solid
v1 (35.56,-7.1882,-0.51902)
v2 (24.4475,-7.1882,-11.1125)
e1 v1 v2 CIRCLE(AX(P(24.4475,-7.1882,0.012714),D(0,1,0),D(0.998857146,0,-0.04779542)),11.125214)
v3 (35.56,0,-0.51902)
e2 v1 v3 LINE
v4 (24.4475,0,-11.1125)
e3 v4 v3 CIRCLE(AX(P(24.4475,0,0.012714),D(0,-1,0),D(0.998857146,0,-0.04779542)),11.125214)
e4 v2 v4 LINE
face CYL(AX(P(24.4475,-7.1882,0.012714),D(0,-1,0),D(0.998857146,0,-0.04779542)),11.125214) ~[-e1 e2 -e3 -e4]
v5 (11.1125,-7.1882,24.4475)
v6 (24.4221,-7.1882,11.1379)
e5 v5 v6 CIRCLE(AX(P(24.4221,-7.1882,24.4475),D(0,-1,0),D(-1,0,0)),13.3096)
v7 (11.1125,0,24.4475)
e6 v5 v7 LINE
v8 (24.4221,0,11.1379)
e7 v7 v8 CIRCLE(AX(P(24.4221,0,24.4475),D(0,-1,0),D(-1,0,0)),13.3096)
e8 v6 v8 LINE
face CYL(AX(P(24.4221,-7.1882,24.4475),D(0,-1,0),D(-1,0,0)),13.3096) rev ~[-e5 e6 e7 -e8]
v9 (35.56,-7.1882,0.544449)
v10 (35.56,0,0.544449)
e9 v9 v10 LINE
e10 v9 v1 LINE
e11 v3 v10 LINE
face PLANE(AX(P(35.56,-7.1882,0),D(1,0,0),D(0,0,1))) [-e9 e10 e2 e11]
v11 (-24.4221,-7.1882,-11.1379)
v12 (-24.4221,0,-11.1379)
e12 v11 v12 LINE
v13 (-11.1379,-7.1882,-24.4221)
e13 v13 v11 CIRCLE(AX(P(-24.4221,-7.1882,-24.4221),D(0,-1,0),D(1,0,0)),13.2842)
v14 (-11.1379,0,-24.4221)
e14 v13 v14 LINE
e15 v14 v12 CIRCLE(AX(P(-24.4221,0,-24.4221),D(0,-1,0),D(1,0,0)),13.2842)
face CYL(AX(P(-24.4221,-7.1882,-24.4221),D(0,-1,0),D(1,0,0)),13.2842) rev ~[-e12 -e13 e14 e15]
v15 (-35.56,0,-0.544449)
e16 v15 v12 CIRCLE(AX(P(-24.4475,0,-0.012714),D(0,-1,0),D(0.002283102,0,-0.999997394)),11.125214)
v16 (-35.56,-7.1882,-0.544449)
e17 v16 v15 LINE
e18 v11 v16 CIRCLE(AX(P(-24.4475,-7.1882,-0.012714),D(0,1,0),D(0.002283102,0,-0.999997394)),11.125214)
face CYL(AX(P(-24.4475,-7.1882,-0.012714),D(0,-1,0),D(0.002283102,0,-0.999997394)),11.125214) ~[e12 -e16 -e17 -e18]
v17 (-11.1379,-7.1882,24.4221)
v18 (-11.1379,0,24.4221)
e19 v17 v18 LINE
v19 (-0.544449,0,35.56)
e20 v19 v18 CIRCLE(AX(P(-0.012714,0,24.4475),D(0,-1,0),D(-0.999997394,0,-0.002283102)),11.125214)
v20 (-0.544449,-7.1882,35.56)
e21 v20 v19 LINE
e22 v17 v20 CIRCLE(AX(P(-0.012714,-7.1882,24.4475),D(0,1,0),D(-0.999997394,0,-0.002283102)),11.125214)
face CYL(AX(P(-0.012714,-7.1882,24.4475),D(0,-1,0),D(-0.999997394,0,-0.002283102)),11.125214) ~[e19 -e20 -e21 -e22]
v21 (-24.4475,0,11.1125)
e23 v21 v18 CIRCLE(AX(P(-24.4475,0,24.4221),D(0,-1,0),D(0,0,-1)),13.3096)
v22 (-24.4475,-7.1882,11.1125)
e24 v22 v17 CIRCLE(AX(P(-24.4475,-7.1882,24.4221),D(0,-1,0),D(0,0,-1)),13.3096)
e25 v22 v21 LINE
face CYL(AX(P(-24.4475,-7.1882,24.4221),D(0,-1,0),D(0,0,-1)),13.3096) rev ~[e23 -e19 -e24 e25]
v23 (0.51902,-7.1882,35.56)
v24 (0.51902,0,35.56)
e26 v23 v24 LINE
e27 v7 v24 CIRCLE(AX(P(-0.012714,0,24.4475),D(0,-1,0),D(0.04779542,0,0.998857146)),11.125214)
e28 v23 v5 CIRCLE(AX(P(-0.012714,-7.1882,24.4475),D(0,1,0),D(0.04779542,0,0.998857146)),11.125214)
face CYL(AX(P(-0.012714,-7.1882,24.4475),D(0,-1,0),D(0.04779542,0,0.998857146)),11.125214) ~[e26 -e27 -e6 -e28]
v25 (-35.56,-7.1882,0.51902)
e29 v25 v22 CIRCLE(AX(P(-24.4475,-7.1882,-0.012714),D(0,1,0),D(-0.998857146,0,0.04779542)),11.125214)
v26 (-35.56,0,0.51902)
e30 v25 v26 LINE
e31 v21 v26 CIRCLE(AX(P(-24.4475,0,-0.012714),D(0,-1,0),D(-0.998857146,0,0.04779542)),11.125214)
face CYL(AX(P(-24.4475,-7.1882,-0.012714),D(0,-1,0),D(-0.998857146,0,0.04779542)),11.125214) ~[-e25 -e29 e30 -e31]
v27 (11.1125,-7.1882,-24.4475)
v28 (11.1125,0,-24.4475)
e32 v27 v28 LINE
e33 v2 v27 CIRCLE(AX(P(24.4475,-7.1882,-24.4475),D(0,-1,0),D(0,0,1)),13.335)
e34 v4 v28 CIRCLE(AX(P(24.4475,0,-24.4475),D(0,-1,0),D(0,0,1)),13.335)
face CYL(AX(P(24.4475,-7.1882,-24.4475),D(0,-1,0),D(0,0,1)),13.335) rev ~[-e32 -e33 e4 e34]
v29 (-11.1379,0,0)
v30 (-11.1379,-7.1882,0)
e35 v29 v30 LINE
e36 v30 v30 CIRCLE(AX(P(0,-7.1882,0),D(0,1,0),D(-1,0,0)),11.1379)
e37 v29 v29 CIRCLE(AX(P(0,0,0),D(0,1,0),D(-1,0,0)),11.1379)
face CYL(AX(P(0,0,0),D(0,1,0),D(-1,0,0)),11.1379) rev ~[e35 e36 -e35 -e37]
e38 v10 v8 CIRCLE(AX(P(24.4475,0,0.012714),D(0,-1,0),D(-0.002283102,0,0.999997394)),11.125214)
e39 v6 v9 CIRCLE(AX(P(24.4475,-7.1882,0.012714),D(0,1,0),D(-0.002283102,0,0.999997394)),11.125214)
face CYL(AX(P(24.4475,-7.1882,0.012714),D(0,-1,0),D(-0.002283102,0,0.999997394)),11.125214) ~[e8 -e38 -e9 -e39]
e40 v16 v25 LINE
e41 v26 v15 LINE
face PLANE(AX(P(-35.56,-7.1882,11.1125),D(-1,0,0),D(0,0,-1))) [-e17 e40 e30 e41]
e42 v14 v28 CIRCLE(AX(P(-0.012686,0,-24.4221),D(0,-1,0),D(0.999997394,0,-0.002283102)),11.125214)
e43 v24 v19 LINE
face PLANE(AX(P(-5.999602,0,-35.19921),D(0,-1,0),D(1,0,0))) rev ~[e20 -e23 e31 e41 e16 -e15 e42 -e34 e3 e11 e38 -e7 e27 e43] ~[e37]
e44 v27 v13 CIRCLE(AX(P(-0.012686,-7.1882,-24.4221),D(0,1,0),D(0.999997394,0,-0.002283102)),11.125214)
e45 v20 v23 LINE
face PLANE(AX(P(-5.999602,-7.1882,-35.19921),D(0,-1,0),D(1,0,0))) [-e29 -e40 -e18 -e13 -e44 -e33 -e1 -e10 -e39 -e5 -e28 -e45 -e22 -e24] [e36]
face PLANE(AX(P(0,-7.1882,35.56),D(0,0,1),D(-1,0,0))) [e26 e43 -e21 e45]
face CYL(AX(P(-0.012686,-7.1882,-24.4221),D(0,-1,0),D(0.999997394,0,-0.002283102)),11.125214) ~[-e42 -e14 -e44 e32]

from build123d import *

# Parameters (mm, degrees)
F0_R      = 35.56
F1_DEPTH  = 7.1882
F2_R      = 11.1379
F3_DEPTH  = 7.62
F7_DEPTH  = 7.1882
F9_DEPTH  = 7.1882
F11_DEPTH = 7.1882
F13_DEPTH = 7.1882
F15_DEPTH = 25.4


# Not quite as in the source:
# - a feature of the source that left no trace in its solid (it failed there, or was rolled back) is left out


with BuildPart() as f1:
    # F0 (on Front) → F1 (new body)
    with BuildSketch(Plane.XZ):
        Circle(F0_R)
    extrude(amount=F1_DEPTH)

    # F2 (on face) → F3 (cut)
    with BuildSketch(Plane(origin=(0, 0, 0), x_dir=(-1, 0, 0), z_dir=(0, 1, 0))):
        Circle(F2_R)
    extrude(amount=-F3_DEPTH, mode=Mode.SUBTRACT)

    # F6 (on face) → F7 (join)
    with BuildSketch(Plane.XZ.offset(7.1882)):
        with BuildLine():
            Line((35.56, 11.1379), (33.7707089589, 11.1379))
            ThreePointArc((33.7707089589, 11.1379), (35.1098277593, 5.6403541298), (35.56, 0))
            Line((35.56, 0), (35.56, 11.1379))
        make_face()
        with BuildLine():
            Line((35.56, -11.1125), (35.56, 0))
            ThreePointArc((35.56, 0), (35.1119461572, -5.6271517709), (33.7790755313, -11.1125))
            Line((33.7790755313, -11.1125), (35.56, -11.1125))
        make_face()
    extrude(amount=-F7_DEPTH)

    # F8 (on face) → F9 (join)
    with BuildSketch(Plane.XZ.offset(7.1882)):
        with BuildLine():
            Line((-11.1379, 35.56), (-11.1379, 33.7707089589))
            ThreePointArc((-11.1379, 33.7707089589), (-5.6403540801, 35.1098277673), (1.006e-07, 35.56))
            Line((1.006e-07, 35.56), (-11.1379, 35.56))
        make_face()
        with BuildLine():
            Line((11.1125, 35.56), (1.006e-07, 35.56))
            ThreePointArc((1.006e-07, 35.56), (5.6271518206, 35.1119461492), (11.1125, 33.7790755313))
            Line((11.1125, 33.7790755313), (11.1125, 35.56))
        make_face()
    extrude(amount=-F9_DEPTH)

    # F10 (on face) → F11 (join)
    with BuildSketch(Plane.XZ.offset(7.1882)):
        with BuildLine():
            ThreePointArc((-35.56, 0), (-35.1119461572, 5.627151771), (-33.7790755313, 11.1125))
            Line((-33.7790755313, 11.1125), (-35.56, 11.1125))
            Line((-35.56, 11.1125), (-35.56, 0))
        make_face()
        with BuildLine():
            Line((-35.56, -11.1379), (-33.7707089589, -11.1379))
            ThreePointArc((-33.7707089589, -11.1379), (-35.1098277593, -5.6403541298), (-35.56, 0))
            Line((-35.56, 0), (-35.56, -11.1379))
        make_face()
    extrude(amount=-F11_DEPTH)

    # F12 (on face) → F13 (join)
    with BuildSketch(Plane.XZ.offset(7.1882)):
        with BuildLine():
            ThreePointArc((0, -35.56), (-5.6403541298, -35.1098277593), (-11.1379, -33.7707089589))
            Line((-11.1379, -33.7707089589), (-11.1379, -35.56))
            Line((-11.1379, -35.56), (0, -35.56))
        make_face()
        with BuildLine():
            Line((11.1125, -35.56), (11.1125, -33.7790755313))
            ThreePointArc((11.1125, -33.7790755313), (5.6271517709, -35.1119461572), (0, -35.56))
            Line((0, -35.56), (11.1125, -35.56))
        make_face()
    extrude(amount=-F13_DEPTH)

    # F14 (on face) → F15 (cut)
    with BuildSketch(Plane.XZ.offset(7.1882)):
        with BuildLine():
            ThreePointArc((-11.1379, 24.4221), (-8.0739891454, 32.1147190965), (-0.5444488019, 35.56))
            Line((-0.5444488019, 35.56), (-11.1379, 35.56))
            Line((-11.1379, 35.56), (-11.1379, 33.7707089589))
            ThreePointArc((-11.1379, 33.7707089589), (-25.1541702512, 25.1352604716), (-33.7790755313, 11.1125))
            Line((-33.7790755313, 11.1125), (-35.56, 11.1125))
            Line((-35.56, 11.1125), (-35.56, 0.5190198064))
            ThreePointArc((-35.56, 0.5190198064), (-32.1239164631, 8.03980237), (-24.4475, 11.1125))
            ThreePointArc((-24.4475, 11.1125), (-15.0361915851, 15.0107915851), (-11.1379, 24.4221))
        make_face()
        with BuildLine():
            Line((-0.5444488019, 35.56), (0.5190198064, 35.56))
            ThreePointArc((0.5190198064, 35.56), (-0.0127144977, 35.5727144977), (-0.5444488019, 35.56))
        make_face()
        with BuildLine():
            ThreePointArc((0.5190198064, 35.56), (8.03980237, 32.1239164631), (11.1125, 24.4475))
            ThreePointArc((11.1125, 24.4475), (15.0107915851, 15.0361915851), (24.4221, 11.1379))
            ThreePointArc((24.4221, 11.1379), (32.1147190965, 8.0739891454), (35.56, 0.5444488019))
            Line((35.56, 0.5444488019), (35.56, 11.1379))
            Line((35.56, 11.1379), (33.7707089589, 11.1379))
            ThreePointArc((33.7707089589, 11.1379), (25.1352604716, 25.1541702512), (11.1125, 33.7790755313))
            Line((11.1125, 33.7790755313), (11.1125, 35.56))
            Line((11.1125, 35.56), (0.5190198064, 35.56))
        make_face()
        with BuildLine():
            ThreePointArc((35.56, -0.5190198064), (35.5727144977, 0.0127144977), (35.56, 0.5444488019))
            Line((35.56, 0.5444488019), (35.56, -0.5190198064))
        make_face()
        with BuildLine():
            Line((35.56, -11.1125), (35.56, -0.5190198064))
            ThreePointArc((35.56, -0.5190198064), (32.1239164631, -8.03980237), (24.4475, -11.1125))
            ThreePointArc((24.4475, -11.1125), (15.0182310729, -15.0182310729), (11.1125, -24.4475))
            ThreePointArc((11.1125, -24.4475), (-0.0253855106, -35.5473072489), (-11.1379, -24.4221))
            ThreePointArc((-11.1379, -24.4221), (-15.0287520974, -15.0287520974), (-24.4221, -11.1379))
            ThreePointArc((-24.4221, -11.1379), (-32.1147190965, -8.0739891454), (-35.56, -0.5444488019))
            Line((-35.56, -0.5444488019), (-35.56, -11.1379))
            Line((-35.56, -11.1379), (-33.7707089589, -11.1379))
            ThreePointArc((-33.7707089589, -11.1379), (-25.144717139, -25.144717139), (-11.1379, -33.7707089589))
            Line((-11.1379, -33.7707089589), (-11.1379, -35.56))
            Line((-11.1379, -35.56), (11.1125, -35.56))
            Line((11.1125, -35.56), (11.1125, -33.7790755313))
            ThreePointArc((11.1125, -33.7790755313), (25.144717139, -25.144717139), (33.7790755313, -11.1125))
            Line((33.7790755313, -11.1125), (35.56, -11.1125))
        make_face()
        with BuildLine():
            Line((-35.56, -0.5444488019), (-35.56, 0.5190198064))
            ThreePointArc((-35.56, 0.5190198064), (-35.5727144977, -0.0127144977), (-35.56, -0.5444488019))
        make_face()
    extrude(amount=-F15_DEPTH, mode=Mode.SUBTRACT)


solid = f1.part
